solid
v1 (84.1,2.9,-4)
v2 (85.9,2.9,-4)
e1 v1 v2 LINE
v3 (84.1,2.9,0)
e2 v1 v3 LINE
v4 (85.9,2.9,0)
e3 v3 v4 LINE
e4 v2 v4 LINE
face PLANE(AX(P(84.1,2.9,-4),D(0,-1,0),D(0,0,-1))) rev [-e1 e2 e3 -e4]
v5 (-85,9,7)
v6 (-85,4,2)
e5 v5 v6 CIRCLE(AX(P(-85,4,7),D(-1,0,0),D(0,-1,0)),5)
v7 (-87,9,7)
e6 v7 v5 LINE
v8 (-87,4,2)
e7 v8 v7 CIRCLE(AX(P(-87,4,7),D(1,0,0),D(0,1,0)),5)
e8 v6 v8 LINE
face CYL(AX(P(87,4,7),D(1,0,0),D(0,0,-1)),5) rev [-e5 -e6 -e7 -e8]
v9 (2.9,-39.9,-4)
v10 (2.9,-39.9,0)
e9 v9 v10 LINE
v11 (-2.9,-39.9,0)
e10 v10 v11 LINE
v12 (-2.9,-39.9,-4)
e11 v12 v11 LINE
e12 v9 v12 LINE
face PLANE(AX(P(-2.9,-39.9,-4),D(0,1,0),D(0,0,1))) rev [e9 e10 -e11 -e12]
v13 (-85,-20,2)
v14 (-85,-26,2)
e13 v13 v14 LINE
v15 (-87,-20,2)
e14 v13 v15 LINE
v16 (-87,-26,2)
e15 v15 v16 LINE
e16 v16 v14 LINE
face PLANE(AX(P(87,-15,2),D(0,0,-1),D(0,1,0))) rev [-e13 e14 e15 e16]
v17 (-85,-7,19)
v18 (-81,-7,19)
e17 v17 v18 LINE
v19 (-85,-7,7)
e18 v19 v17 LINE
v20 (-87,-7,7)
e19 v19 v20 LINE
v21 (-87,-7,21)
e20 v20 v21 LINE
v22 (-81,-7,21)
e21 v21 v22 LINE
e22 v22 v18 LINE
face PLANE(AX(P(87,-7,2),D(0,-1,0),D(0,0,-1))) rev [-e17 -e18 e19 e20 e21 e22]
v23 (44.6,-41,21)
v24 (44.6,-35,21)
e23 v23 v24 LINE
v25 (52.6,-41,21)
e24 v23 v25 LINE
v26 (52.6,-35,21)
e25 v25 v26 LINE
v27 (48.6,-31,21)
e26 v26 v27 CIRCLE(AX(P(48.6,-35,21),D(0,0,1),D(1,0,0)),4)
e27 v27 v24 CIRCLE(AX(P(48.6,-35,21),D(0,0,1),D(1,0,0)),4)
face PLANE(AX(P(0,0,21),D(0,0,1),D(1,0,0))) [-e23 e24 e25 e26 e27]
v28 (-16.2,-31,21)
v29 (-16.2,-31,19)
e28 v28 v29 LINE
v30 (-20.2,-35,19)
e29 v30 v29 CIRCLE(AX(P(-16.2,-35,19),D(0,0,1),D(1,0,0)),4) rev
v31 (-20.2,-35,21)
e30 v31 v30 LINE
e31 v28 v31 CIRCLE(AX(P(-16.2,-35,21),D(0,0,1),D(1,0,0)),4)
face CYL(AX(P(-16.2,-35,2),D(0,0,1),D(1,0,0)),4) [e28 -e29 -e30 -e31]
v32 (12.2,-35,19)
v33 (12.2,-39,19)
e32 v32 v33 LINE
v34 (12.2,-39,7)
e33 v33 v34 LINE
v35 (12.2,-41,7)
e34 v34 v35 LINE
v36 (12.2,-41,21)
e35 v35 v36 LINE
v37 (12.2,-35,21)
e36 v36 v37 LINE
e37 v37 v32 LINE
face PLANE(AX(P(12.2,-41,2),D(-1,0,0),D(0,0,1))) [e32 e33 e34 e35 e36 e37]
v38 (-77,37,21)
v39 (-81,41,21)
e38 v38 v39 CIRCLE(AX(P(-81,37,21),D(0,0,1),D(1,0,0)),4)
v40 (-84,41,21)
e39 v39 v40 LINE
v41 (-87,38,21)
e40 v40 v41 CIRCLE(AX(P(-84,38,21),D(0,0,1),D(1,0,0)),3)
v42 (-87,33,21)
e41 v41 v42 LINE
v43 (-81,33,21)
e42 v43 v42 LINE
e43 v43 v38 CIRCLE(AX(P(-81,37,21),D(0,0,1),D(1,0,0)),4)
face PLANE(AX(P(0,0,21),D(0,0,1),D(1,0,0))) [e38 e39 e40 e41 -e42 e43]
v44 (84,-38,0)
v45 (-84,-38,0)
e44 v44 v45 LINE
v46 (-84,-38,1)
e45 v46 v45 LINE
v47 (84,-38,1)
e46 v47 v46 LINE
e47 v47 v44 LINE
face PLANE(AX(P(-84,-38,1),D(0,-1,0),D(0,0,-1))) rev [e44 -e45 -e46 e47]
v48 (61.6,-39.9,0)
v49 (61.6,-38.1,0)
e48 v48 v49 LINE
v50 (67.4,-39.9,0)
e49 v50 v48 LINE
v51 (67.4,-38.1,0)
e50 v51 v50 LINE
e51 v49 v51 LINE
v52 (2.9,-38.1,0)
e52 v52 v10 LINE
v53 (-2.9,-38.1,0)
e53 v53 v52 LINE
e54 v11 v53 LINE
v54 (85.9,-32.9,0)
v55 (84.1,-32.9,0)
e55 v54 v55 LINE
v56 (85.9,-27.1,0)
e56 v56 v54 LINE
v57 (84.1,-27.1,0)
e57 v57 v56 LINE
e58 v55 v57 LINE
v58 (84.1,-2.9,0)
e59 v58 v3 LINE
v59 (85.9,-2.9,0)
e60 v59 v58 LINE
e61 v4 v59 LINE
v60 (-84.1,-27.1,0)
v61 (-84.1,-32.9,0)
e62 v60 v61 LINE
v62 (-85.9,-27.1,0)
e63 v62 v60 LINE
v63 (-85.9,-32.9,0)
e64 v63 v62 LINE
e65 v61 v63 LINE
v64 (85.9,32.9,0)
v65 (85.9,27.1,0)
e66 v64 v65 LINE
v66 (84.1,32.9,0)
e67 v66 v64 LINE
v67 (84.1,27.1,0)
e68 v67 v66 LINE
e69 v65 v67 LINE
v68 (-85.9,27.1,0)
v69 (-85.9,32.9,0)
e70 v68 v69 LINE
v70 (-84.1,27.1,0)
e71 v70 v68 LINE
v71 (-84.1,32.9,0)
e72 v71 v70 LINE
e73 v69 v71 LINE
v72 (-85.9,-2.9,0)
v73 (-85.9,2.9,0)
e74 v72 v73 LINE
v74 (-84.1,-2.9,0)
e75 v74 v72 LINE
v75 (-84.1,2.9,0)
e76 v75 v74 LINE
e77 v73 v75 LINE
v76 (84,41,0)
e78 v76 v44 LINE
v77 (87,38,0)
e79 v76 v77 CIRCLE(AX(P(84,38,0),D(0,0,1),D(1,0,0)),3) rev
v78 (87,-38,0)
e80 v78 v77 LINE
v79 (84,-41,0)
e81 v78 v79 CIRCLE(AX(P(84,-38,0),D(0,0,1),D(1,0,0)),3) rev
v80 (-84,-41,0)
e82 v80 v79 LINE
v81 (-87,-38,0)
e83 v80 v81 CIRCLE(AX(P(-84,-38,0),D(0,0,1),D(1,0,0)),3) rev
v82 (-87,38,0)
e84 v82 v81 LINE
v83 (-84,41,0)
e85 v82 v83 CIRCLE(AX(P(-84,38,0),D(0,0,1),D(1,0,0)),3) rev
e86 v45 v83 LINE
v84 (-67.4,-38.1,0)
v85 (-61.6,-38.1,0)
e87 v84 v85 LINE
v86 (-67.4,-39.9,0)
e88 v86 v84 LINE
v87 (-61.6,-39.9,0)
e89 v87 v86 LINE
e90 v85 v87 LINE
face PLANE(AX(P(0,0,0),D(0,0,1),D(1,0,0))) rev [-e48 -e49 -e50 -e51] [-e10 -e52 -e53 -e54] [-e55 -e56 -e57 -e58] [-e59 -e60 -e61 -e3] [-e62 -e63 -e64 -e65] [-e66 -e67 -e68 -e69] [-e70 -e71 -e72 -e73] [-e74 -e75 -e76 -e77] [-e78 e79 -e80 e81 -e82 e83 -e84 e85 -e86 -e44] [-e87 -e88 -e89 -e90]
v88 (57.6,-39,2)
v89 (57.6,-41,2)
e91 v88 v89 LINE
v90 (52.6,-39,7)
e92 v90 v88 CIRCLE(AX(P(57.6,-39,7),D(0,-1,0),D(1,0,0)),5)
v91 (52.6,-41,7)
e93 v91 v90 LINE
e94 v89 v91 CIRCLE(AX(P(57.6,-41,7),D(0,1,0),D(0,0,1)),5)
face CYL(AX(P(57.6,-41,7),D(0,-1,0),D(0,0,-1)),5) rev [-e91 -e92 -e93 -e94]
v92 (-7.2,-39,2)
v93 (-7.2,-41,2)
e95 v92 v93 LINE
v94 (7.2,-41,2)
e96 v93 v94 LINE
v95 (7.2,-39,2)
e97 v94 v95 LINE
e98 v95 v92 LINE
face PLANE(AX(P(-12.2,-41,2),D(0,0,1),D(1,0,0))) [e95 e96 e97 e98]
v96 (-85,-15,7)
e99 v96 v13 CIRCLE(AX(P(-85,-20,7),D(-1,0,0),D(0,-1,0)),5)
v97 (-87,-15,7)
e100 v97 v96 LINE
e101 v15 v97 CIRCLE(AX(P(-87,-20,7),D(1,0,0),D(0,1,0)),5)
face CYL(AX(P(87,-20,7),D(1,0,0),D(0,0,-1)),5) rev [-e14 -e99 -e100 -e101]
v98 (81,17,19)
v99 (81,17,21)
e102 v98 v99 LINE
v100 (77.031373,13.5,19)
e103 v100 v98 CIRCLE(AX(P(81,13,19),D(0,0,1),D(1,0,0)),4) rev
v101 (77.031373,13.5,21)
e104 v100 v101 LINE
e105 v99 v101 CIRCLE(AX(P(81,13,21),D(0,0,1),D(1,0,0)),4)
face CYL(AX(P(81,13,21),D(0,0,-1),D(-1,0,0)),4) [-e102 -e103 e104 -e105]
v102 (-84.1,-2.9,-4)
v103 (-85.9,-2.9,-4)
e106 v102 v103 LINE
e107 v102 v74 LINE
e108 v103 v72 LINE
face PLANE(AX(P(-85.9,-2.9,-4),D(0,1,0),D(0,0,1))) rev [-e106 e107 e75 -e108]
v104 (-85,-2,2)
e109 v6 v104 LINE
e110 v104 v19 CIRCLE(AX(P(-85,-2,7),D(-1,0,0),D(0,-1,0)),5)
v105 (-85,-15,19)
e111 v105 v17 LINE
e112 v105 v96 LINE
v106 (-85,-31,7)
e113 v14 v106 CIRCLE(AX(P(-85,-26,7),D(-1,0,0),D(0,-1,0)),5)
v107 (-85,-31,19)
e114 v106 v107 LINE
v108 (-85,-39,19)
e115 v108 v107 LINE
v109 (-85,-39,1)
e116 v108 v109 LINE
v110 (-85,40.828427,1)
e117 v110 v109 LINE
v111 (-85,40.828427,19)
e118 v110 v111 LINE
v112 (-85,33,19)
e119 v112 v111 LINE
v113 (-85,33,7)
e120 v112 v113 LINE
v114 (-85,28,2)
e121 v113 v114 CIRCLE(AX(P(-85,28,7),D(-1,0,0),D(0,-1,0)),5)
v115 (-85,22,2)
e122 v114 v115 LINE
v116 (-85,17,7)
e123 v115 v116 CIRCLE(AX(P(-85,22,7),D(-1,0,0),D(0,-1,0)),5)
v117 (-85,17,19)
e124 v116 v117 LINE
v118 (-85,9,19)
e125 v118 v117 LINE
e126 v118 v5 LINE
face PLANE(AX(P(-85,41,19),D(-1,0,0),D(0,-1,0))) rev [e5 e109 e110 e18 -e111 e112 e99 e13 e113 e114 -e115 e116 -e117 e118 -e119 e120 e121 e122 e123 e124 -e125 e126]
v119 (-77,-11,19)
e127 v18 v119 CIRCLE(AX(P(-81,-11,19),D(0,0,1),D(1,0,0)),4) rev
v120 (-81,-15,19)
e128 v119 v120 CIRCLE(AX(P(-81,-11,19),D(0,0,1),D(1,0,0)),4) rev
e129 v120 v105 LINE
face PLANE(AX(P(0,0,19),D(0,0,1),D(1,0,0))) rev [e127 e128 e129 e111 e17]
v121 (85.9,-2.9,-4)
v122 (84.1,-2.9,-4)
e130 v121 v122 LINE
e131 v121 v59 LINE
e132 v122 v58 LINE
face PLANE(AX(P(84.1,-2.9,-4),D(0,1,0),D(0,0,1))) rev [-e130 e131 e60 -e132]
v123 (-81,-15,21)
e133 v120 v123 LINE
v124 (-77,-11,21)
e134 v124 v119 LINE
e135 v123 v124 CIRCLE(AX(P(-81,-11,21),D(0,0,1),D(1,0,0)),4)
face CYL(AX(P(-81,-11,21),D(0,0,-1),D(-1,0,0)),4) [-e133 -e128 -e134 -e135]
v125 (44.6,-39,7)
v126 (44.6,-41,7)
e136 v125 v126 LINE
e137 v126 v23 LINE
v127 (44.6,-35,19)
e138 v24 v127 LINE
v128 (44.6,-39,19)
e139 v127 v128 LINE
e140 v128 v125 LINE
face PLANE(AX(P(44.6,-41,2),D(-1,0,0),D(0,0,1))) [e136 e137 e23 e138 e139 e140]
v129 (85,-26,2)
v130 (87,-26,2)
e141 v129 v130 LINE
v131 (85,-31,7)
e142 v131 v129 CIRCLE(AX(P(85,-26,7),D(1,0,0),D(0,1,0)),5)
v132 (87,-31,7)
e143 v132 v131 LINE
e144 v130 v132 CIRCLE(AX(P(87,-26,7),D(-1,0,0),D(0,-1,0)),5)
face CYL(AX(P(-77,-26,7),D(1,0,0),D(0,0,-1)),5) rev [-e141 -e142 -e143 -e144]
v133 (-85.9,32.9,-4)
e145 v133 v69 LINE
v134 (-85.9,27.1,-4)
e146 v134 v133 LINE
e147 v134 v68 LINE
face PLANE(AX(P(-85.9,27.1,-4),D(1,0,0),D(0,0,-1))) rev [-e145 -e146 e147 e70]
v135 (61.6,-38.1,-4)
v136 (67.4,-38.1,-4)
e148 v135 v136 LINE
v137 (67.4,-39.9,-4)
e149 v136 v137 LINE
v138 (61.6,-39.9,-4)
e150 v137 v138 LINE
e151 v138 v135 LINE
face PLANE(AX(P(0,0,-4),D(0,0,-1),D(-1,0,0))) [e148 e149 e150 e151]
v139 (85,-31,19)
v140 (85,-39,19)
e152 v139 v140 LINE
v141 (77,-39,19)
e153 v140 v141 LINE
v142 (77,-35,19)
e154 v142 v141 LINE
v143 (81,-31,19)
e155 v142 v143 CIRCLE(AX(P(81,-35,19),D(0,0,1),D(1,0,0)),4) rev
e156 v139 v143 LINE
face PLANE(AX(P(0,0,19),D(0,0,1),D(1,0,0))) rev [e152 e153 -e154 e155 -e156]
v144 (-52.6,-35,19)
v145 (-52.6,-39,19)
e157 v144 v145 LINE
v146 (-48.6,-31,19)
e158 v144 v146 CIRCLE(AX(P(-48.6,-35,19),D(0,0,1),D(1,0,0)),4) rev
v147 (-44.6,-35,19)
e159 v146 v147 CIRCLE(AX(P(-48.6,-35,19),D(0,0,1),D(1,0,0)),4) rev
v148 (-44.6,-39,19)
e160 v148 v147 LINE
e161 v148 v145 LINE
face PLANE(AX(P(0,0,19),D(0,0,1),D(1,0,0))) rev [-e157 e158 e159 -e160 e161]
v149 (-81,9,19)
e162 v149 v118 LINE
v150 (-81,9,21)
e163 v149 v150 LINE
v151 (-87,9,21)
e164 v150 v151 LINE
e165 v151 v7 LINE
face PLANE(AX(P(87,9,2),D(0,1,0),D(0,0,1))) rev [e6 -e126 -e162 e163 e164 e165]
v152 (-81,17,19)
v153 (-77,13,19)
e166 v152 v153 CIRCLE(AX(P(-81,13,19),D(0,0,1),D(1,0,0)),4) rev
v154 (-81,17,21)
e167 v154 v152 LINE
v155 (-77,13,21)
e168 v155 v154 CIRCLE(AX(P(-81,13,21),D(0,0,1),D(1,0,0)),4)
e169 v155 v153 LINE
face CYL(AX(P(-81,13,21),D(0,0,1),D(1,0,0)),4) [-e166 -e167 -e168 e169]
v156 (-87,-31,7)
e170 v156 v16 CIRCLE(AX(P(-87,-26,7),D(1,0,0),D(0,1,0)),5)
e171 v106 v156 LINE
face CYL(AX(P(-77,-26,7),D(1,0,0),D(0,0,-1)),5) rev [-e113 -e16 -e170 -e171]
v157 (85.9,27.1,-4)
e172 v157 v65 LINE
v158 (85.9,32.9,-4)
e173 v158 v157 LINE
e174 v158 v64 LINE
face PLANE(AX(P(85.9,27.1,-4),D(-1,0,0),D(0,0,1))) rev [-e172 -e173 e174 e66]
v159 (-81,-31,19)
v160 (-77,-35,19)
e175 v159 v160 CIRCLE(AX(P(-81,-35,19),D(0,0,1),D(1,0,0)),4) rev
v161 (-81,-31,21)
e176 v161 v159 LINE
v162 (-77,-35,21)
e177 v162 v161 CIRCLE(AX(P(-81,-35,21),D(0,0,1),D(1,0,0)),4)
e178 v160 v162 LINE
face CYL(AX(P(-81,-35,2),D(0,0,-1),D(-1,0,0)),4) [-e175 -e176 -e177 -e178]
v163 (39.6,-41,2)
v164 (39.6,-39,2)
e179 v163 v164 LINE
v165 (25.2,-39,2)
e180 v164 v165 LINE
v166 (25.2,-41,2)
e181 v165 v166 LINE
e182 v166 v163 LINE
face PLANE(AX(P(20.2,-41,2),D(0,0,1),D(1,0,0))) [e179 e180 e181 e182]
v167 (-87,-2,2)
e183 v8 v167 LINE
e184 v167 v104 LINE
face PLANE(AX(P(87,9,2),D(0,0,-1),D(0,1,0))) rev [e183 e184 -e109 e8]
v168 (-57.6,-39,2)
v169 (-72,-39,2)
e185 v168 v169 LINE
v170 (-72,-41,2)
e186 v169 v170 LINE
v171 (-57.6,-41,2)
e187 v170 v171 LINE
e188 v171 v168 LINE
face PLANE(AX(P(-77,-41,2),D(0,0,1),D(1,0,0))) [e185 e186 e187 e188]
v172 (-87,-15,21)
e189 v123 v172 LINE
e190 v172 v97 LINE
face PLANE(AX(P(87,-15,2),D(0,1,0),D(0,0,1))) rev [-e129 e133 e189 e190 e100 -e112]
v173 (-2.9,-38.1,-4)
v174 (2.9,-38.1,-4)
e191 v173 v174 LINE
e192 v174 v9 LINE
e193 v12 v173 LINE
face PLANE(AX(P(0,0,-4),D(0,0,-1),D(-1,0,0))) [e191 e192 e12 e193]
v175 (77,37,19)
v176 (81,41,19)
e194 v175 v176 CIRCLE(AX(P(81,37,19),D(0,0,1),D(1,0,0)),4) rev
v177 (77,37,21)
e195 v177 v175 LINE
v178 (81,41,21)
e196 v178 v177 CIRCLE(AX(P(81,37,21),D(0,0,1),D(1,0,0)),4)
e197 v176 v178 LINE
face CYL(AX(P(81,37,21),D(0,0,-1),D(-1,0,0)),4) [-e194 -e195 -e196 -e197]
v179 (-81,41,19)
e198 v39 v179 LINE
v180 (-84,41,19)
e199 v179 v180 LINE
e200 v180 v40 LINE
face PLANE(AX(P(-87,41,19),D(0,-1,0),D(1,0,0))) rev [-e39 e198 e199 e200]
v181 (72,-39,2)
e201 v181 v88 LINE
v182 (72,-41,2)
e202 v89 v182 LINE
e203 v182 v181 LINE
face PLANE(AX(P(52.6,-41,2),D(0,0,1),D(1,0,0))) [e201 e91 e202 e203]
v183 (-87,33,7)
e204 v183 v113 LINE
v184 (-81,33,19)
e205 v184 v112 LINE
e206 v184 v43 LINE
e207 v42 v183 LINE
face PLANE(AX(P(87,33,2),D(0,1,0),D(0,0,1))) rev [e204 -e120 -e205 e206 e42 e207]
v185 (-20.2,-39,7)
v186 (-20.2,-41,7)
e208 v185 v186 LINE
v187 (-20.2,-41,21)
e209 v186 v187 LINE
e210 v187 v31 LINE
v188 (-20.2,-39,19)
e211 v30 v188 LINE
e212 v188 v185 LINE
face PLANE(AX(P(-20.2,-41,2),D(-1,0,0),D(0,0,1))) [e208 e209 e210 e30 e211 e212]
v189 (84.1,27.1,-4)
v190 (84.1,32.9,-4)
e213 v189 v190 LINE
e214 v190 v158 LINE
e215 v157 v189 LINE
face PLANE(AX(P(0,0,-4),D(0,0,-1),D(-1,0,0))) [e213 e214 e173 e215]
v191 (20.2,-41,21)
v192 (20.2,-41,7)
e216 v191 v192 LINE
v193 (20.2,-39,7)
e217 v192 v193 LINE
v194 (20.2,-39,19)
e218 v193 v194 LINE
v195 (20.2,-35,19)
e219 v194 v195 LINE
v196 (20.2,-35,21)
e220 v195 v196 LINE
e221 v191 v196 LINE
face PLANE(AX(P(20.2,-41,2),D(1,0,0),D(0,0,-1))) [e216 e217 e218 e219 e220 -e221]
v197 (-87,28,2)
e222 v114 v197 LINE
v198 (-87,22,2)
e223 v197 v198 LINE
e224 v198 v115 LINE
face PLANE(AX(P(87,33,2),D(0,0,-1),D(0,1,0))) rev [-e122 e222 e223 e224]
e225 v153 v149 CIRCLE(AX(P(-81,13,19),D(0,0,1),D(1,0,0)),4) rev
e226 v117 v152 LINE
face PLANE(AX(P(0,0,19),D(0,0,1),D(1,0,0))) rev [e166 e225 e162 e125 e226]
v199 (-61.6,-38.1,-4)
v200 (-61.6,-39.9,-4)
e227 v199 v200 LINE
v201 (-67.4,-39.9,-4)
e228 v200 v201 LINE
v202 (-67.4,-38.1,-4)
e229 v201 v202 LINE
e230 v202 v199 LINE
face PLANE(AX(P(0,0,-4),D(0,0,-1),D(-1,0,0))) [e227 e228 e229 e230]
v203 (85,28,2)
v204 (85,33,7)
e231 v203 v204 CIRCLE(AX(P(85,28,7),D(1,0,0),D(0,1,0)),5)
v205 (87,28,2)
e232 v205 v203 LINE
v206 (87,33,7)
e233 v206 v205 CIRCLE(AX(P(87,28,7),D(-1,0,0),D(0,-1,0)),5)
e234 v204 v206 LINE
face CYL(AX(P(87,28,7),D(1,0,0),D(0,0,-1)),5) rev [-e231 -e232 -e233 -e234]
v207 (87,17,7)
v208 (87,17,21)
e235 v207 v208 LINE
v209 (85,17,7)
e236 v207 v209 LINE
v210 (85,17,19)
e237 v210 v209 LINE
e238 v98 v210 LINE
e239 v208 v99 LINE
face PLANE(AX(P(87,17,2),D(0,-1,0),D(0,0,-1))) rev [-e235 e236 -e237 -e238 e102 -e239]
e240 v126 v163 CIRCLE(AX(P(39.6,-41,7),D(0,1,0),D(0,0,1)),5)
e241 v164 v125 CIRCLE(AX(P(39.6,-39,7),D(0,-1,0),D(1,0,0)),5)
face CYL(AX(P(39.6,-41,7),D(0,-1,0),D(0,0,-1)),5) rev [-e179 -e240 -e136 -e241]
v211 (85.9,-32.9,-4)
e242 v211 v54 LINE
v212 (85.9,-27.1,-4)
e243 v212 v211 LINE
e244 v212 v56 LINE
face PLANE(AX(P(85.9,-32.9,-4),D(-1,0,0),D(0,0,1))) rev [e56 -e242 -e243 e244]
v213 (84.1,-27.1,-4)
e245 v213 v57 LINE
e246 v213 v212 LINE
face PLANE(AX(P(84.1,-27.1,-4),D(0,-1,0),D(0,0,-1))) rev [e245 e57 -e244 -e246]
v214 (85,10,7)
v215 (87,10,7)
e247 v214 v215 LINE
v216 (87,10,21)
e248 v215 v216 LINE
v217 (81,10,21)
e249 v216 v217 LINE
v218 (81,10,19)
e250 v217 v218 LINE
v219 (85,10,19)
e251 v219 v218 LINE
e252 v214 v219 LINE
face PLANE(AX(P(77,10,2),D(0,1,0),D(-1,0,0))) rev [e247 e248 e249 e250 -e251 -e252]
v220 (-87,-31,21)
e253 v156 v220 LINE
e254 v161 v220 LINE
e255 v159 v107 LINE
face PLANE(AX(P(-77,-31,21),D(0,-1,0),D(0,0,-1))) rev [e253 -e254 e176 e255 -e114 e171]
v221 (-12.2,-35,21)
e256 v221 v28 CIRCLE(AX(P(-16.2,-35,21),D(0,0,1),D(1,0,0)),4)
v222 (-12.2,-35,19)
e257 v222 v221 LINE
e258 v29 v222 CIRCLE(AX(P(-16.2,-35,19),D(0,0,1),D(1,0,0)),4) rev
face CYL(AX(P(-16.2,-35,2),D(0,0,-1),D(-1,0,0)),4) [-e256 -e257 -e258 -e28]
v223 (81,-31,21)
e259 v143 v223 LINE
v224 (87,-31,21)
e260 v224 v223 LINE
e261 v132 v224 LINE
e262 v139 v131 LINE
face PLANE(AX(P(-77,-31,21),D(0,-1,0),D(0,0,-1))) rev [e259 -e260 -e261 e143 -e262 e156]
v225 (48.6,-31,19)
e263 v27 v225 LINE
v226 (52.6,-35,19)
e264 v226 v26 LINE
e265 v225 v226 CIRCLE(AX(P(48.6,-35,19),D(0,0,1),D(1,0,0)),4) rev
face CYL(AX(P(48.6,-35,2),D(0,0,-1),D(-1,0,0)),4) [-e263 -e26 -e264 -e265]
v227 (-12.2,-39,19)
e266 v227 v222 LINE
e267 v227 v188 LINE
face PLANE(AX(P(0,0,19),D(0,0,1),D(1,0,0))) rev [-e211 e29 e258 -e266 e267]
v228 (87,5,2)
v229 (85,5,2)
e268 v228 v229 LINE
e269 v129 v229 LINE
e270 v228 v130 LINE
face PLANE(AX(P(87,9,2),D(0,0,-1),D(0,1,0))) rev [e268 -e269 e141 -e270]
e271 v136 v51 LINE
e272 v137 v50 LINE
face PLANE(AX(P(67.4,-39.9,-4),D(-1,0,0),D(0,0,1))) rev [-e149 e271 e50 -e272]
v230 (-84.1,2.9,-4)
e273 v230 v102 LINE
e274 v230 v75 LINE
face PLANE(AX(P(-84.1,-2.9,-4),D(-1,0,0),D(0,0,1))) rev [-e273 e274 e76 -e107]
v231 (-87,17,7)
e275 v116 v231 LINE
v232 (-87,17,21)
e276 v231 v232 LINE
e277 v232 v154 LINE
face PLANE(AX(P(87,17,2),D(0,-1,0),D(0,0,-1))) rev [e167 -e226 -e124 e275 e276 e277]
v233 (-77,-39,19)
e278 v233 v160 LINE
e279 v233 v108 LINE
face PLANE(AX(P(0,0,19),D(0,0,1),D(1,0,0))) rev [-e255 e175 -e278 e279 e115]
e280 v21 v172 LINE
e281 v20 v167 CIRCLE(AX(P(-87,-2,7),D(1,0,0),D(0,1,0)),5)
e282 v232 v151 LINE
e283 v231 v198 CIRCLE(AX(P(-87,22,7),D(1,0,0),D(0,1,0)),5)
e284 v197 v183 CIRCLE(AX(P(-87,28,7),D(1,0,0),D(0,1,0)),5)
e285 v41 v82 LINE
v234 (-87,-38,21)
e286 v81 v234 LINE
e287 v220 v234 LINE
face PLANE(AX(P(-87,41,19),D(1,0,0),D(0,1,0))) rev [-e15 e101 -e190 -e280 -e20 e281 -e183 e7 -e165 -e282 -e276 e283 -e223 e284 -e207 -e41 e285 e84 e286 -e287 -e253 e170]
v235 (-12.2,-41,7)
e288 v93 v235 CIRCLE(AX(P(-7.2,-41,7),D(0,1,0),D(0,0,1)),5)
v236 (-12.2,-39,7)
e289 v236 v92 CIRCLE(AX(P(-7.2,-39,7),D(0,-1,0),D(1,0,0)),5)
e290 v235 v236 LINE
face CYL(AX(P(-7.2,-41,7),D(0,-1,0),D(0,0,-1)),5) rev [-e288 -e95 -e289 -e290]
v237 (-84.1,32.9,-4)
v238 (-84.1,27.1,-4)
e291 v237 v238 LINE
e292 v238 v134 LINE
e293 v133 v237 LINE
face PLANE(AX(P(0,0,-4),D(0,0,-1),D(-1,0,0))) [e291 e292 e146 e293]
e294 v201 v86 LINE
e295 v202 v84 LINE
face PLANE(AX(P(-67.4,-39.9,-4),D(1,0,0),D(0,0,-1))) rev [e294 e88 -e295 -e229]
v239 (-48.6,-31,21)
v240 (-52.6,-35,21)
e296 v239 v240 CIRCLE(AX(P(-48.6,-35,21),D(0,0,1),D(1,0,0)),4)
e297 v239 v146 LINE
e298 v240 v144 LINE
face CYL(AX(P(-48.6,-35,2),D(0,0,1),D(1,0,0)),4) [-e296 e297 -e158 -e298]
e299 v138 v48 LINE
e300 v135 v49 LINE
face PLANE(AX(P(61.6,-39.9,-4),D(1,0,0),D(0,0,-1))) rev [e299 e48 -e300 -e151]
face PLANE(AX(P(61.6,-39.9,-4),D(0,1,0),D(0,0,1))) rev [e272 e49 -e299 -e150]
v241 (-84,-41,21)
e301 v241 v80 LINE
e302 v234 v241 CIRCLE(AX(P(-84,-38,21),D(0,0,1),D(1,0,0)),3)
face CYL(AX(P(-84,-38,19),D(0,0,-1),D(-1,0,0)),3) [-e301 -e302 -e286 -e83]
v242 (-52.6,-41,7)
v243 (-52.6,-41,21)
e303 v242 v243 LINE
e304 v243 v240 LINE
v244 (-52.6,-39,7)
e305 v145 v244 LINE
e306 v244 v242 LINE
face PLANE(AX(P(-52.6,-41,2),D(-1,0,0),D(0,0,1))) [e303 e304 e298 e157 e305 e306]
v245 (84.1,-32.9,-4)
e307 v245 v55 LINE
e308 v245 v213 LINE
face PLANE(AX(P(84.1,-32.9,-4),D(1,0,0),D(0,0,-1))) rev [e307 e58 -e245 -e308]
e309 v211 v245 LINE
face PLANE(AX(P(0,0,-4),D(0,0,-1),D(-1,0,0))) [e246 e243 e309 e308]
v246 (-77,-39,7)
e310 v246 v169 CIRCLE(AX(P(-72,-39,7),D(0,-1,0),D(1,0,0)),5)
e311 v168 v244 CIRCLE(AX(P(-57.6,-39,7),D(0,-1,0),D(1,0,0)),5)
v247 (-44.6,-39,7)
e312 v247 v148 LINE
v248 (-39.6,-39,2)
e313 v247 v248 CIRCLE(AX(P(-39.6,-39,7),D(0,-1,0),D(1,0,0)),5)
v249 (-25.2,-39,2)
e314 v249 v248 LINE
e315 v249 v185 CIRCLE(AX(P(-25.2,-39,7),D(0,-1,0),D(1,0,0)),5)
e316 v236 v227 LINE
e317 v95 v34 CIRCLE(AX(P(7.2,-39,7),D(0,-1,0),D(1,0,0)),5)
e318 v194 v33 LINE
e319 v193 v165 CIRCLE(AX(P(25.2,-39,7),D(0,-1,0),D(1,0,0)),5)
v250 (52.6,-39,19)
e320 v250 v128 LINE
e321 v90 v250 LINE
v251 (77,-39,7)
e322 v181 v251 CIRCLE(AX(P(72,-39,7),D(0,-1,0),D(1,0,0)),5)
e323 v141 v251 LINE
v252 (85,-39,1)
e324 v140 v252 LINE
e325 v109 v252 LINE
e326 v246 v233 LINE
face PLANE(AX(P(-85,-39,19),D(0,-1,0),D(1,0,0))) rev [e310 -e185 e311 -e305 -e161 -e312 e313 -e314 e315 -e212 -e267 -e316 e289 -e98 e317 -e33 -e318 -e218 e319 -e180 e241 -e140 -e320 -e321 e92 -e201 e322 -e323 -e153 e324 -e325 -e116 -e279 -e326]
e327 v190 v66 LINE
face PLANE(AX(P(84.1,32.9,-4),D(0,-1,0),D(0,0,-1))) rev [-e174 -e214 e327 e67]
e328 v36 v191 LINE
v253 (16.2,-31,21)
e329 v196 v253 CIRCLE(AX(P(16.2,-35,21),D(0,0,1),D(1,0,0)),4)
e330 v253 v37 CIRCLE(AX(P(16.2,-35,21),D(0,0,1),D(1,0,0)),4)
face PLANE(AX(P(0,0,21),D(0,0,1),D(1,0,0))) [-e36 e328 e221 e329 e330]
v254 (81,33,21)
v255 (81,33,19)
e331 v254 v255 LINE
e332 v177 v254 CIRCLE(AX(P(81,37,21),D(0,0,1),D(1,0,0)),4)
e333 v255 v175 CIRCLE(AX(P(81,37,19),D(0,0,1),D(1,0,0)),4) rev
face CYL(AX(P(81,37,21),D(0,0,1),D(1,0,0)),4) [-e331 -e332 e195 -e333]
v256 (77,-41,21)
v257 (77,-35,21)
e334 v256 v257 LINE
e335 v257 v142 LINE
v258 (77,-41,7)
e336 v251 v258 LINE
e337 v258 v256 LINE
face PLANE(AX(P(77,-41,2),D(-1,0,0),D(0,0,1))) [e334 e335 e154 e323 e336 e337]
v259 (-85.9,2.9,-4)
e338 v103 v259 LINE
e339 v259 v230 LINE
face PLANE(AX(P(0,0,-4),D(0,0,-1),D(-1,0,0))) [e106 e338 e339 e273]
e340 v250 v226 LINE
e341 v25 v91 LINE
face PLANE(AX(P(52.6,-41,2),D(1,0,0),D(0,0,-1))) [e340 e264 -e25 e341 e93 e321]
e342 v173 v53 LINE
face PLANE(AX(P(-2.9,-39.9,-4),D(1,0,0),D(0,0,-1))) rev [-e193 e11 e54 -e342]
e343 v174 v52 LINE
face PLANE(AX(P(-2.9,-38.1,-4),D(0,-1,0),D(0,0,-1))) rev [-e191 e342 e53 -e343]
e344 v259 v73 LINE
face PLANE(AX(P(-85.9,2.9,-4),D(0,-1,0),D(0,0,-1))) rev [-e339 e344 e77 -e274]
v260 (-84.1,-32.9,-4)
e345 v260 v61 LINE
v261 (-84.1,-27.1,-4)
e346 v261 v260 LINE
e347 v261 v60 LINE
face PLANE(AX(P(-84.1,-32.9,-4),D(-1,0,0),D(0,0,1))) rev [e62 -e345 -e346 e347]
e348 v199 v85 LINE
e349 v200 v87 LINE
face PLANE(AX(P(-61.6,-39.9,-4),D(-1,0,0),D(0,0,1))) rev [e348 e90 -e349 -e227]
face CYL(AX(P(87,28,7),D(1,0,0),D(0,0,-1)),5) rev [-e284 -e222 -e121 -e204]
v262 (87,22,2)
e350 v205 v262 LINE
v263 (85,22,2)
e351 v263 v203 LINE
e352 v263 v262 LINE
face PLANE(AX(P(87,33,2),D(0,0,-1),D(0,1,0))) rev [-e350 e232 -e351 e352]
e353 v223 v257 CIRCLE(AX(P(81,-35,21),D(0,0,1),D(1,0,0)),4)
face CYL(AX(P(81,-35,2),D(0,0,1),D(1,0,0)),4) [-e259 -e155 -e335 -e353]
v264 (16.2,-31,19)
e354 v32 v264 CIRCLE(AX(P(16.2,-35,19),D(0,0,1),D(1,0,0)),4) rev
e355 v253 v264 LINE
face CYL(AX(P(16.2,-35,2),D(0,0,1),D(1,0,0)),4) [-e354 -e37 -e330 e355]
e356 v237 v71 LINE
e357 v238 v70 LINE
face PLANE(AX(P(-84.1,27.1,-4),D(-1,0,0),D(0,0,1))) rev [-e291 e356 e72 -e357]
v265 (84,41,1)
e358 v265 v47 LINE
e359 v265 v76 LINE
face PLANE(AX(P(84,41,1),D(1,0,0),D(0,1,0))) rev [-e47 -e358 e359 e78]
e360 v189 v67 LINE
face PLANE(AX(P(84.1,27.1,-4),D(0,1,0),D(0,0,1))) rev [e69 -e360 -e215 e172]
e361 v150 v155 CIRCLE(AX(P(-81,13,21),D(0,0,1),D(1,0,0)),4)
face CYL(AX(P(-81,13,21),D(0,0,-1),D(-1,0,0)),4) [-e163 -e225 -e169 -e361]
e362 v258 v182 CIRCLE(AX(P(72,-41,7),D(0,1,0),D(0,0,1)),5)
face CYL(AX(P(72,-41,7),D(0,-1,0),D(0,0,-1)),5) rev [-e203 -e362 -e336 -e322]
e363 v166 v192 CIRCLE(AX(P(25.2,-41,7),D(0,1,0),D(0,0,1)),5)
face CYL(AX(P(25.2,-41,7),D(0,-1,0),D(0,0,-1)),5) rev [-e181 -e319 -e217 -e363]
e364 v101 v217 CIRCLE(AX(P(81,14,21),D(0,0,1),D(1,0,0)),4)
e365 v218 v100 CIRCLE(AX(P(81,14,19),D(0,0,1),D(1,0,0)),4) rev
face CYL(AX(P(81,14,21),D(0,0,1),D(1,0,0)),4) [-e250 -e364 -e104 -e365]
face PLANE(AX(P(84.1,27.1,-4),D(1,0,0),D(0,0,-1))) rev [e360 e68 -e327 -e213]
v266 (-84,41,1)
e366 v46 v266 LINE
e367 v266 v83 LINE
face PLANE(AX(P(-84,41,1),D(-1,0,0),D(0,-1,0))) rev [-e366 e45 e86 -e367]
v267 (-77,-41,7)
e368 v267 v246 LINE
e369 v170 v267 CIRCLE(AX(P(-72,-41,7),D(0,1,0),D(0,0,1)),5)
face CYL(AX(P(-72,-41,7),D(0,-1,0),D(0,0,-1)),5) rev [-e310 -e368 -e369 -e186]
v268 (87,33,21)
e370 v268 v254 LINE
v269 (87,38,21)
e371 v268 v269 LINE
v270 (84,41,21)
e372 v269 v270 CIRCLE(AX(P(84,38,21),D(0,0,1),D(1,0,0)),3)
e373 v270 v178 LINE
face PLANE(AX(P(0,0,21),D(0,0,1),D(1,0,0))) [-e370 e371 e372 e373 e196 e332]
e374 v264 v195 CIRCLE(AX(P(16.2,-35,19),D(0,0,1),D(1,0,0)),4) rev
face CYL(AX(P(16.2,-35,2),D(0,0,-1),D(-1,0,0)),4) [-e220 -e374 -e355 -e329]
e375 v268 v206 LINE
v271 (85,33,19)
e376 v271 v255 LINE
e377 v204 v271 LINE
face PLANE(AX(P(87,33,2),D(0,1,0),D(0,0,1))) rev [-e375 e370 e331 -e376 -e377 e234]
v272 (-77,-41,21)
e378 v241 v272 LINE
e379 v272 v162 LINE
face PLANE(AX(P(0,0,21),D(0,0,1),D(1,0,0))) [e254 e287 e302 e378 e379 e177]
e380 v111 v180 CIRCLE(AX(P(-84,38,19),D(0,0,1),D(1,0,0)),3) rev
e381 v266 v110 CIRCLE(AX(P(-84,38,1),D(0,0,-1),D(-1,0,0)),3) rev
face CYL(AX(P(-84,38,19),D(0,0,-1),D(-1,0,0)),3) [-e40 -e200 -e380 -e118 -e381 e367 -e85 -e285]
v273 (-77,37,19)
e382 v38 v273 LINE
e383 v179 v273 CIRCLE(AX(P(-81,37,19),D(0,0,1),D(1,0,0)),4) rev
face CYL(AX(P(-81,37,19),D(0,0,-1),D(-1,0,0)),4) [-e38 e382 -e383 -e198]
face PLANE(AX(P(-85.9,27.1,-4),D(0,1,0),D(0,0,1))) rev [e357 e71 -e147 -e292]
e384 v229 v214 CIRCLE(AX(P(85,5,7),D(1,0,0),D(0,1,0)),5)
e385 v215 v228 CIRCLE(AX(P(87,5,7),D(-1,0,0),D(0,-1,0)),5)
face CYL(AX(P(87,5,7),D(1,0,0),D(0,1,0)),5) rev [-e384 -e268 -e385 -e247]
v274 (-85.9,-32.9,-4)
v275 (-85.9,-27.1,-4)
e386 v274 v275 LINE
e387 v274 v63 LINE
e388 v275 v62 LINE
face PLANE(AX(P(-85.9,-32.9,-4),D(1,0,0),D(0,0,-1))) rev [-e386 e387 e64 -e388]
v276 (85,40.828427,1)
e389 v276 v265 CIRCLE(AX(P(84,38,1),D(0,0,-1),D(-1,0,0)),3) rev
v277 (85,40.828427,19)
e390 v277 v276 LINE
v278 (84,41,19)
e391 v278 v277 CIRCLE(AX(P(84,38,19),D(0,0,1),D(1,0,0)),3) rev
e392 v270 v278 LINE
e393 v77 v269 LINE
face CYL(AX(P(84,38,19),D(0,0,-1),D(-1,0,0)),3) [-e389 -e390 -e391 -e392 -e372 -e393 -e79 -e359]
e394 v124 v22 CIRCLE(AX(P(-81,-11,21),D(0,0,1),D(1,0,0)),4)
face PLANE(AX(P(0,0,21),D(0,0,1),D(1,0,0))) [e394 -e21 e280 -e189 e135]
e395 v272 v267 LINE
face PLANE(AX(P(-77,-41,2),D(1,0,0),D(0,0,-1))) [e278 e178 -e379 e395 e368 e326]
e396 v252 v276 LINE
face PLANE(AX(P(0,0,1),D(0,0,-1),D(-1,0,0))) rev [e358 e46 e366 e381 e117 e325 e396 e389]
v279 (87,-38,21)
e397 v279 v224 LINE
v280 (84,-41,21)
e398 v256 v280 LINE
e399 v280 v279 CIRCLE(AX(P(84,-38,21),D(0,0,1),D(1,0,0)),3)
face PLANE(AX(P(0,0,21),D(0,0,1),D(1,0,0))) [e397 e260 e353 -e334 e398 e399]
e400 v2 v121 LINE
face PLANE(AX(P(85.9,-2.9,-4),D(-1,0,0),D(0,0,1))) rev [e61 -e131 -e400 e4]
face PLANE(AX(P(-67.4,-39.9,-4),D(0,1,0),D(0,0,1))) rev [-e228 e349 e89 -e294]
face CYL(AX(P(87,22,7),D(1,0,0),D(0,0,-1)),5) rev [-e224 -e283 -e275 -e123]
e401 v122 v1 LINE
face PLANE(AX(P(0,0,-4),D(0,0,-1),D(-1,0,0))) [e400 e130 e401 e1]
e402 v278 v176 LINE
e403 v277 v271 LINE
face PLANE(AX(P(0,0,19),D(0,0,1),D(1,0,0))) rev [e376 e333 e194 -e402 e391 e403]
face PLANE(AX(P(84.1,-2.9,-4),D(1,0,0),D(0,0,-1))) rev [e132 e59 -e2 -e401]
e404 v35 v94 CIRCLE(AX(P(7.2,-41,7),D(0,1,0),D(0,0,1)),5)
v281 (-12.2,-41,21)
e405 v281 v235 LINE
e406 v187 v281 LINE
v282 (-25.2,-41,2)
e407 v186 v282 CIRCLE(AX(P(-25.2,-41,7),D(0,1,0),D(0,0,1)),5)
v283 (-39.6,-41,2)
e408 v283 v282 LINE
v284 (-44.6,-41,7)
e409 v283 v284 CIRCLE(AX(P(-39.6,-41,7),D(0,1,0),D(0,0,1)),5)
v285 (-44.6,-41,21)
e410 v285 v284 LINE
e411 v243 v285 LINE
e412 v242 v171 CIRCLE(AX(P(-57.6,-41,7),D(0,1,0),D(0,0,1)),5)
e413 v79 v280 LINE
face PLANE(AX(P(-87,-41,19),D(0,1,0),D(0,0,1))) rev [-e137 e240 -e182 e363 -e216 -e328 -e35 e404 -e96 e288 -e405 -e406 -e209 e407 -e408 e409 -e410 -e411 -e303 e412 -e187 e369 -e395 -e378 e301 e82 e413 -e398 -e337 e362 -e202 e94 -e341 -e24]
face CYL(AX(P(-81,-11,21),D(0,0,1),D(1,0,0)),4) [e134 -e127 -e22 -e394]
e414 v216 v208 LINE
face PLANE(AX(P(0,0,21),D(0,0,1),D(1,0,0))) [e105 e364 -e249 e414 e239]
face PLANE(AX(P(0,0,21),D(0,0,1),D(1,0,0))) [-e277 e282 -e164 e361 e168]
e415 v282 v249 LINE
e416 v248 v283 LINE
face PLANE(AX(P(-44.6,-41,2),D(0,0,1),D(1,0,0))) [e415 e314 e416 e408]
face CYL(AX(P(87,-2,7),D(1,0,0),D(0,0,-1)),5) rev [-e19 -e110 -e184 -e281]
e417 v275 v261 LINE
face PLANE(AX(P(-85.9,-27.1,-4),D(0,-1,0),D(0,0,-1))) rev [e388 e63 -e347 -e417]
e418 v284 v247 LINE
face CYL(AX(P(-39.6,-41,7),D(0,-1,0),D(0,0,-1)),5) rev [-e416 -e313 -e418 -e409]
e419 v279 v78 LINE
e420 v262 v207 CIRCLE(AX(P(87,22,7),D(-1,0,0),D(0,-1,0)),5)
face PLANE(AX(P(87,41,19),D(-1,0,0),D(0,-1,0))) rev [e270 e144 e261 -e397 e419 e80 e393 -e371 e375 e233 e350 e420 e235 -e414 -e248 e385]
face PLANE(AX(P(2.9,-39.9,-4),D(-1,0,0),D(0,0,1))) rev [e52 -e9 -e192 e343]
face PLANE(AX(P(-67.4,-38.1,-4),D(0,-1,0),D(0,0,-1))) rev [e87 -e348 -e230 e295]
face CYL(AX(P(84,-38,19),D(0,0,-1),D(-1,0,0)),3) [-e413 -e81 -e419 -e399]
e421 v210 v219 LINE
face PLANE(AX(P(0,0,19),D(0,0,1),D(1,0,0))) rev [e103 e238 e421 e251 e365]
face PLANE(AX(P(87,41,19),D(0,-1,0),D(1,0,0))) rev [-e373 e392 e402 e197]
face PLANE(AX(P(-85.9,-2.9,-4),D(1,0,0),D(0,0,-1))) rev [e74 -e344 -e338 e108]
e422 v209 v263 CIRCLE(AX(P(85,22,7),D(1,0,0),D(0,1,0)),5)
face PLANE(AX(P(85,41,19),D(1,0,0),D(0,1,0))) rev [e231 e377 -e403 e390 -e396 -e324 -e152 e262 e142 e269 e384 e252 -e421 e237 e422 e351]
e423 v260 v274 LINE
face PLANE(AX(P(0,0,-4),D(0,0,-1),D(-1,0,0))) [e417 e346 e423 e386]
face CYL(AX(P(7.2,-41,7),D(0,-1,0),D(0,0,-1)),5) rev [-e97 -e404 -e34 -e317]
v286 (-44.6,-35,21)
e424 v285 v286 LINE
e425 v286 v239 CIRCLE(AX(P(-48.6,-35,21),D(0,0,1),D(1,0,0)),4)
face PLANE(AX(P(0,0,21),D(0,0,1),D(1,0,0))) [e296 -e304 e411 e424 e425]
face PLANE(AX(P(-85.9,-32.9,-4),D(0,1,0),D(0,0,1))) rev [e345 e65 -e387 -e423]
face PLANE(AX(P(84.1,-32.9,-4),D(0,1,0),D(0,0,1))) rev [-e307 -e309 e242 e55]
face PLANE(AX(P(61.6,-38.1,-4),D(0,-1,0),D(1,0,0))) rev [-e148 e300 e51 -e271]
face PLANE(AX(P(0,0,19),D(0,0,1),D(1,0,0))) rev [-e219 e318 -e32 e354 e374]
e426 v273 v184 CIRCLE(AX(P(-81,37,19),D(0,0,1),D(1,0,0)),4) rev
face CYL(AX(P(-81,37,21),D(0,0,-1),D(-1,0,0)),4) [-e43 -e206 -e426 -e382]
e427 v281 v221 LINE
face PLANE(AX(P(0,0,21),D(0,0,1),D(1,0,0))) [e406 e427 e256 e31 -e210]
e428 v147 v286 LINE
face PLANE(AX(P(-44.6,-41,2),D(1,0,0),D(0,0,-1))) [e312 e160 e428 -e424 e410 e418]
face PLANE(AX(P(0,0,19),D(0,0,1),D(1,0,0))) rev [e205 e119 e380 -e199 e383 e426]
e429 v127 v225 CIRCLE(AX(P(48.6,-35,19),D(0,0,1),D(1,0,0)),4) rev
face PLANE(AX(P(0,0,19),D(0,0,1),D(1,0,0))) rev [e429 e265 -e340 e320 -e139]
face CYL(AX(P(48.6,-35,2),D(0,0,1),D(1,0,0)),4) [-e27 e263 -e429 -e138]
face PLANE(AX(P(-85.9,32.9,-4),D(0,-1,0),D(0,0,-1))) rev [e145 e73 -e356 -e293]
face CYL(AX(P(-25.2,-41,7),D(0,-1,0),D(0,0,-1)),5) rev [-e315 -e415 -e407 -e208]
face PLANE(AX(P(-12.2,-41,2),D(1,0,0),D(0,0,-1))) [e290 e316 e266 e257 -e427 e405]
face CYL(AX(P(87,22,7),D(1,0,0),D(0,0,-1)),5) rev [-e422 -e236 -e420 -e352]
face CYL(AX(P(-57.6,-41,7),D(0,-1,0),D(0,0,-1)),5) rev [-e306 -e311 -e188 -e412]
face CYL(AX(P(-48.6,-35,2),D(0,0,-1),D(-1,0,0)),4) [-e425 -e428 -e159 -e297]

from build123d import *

# Parameters (mm, degrees)
SKETCH9_W               = 1.8
SKETCH9_H               = 5.8
BOSS_EXTRUDE8_DEPTH     = 4
BOSS_EXTRUDE8_2_DEPTH   = 4
BOSS_EXTRUDE8_3_DEPTH   = 4
BOSS_EXTRUDE8_4_DEPTH   = 4
BOSS_EXTRUDE8_5_DEPTH   = 4
BOSS_EXTRUDE8_6_DEPTH   = 4
SKETCH9_W_2             = 5.8
SKETCH9_H_2             = 1.8
BOSS_EXTRUDE8_7_DEPTH   = 4
BOSS_EXTRUDE8_8_DEPTH   = 4
BOSS_EXTRUDE8_9_DEPTH   = 4
BOSS_EXTRUDE5_DEPTH     = 19
BOSS_EXTRUDE6_DEPTH     = 2
BOSS_EXTRUDE11_DEPTH    = 1
CUT_EXTRUDE6_DEPTH      = 99.442876837
CUT_EXTRUDE6_DEPTH_BACK = 99.442876837
SKETCH18_W              = 19
SKETCH18_H              = 16
SKETCH19_W              = 24.4
SKETCH19_H              = 19
CUT_EXTRUDE8_DEPTH      = 99.442876837
CUT_EXTRUDE9_START      = -19
SKETCH10_W              = 10
SKETCH10_H              = 34
CUT_EXTRUDE9_DEPTH      = 19
FILLET3_R               = 4
FILLET4_R               = 5
FILLET5_R               = 3


with BuildPart() as part:
    # Sketch9 → Boss-Extrude8 (new body)
    with BuildSketch(Plane(origin=(0, 0, 0), x_dir=(1, 0, 0), z_dir=(0, 0, -1))):
        with Locations((-85, 30)):
            Rectangle(SKETCH9_W, SKETCH9_H)
    extrude(amount=BOSS_EXTRUDE8_DEPTH)



with BuildPart() as body_2:
    # Sketch9 → Boss-Extrude8 2 (new body)
    with BuildSketch(Plane(origin=(0, 0, 0), x_dir=(1, 0, 0), z_dir=(0, 0, -1))):
        with Locations((-85, 0)):
            Rectangle(SKETCH9_W, SKETCH9_H)
    extrude(amount=BOSS_EXTRUDE8_2_DEPTH)


with BuildPart() as body_3:
    # Sketch9 → Boss-Extrude8 3 (new body)
    with BuildSketch(Plane(origin=(0, 0, 0), x_dir=(1, 0, 0), z_dir=(0, 0, -1))):
        with Locations((-85, -30)):
            Rectangle(SKETCH9_W, SKETCH9_H)
    extrude(amount=BOSS_EXTRUDE8_3_DEPTH)


with BuildPart() as body_4:
    # Sketch9 → Boss-Extrude8 4 (new body)
    with BuildSketch(Plane(origin=(0, 0, 0), x_dir=(1, 0, 0), z_dir=(0, 0, -1))):
        with Locations((85, 30)):
            Rectangle(SKETCH9_W, SKETCH9_H)
    extrude(amount=BOSS_EXTRUDE8_4_DEPTH)


with BuildPart() as body_5:
    # Sketch9 → Boss-Extrude8 5 (new body)
    with BuildSketch(Plane(origin=(0, 0, 0), x_dir=(1, 0, 0), z_dir=(0, 0, -1))):
        with Locations((85, -30)):
            Rectangle(SKETCH9_W, SKETCH9_H)
    extrude(amount=BOSS_EXTRUDE8_5_DEPTH)


with BuildPart() as body_6:
    # Sketch9 → Boss-Extrude8 6 (new body)
    with BuildSketch(Plane(origin=(0, 0, 0), x_dir=(1, 0, 0), z_dir=(0, 0, -1))):
        with Locations((85, 0)):
            Rectangle(SKETCH9_W, SKETCH9_H)
    extrude(amount=BOSS_EXTRUDE8_6_DEPTH)


with BuildPart() as body_7:
    # Sketch9 → Boss-Extrude8 7 (new body)
    with BuildSketch(Plane(origin=(0, 0, 0), x_dir=(1, 0, 0), z_dir=(0, 0, -1))):
        with Locations((-64.5, 39)):
            Rectangle(SKETCH9_W_2, SKETCH9_H_2)
    extrude(amount=BOSS_EXTRUDE8_7_DEPTH)


with BuildPart() as body_8:
    # Sketch9 → Boss-Extrude8 8 (new body)
    with BuildSketch(Plane(origin=(0, 0, 0), x_dir=(1, 0, 0), z_dir=(0, 0, -1))):
        with Locations((0, 39)):
            Rectangle(SKETCH9_W_2, SKETCH9_H_2)
    extrude(amount=BOSS_EXTRUDE8_8_DEPTH)


with BuildPart() as body_9:
    # Sketch9 → Boss-Extrude8 9 (new body)
    with BuildSketch(Plane(origin=(0, 0, 0), x_dir=(1, 0, 0), z_dir=(0, 0, -1))):
        with Locations((64.5, 39)):
            Rectangle(SKETCH9_W_2, SKETCH9_H_2)
    extrude(amount=BOSS_EXTRUDE8_9_DEPTH)


with BuildPart() as part_1:
    add(part.part)

    add(body_2.part)  # Boss-Extrude5 merges body 2

    add(body_3.part)  # Boss-Extrude5 merges body 3

    add(body_4.part)  # Boss-Extrude5 merges body 4

    add(body_5.part)  # Boss-Extrude5 merges body 5

    add(body_6.part)  # Boss-Extrude5 merges body 6

    add(body_7.part)  # Boss-Extrude5 merges body 7

    add(body_8.part)  # Boss-Extrude5 merges body 8

    add(body_9.part)  # Boss-Extrude5 merges body 9
    # Sketch1 → Boss-Extrude5 (add)
    with BuildSketch(Plane.XY):
        Polygon((-87, 41), (-85, 41), (-85, -39), (85, -39), (85, 41), (87, 41), (87, -41), (-87, -41), align=None)
    extrude(amount=BOSS_EXTRUDE5_DEPTH)

    # Sketch7 → Boss-Extrude6 (add)
    with BuildSketch(Plane.XY.offset(19)):
        Polygon((-87, 41), (-77, 41), (-77, -31), (77, -31), (77, 41), (87, 41), (87, -41), (-87, -41), align=None)
    extrude(amount=BOSS_EXTRUDE6_DEPTH)

    # Sketch17 → Boss-Extrude11 (add)
    with BuildSketch(Plane.XY):
        Polygon((-84, 41), (-85, 41), (-85, -39), (85, -39), (85, 41), (84, 41), (84, -38), (-84, -38), align=None)
    extrude(amount=BOSS_EXTRUDE11_DEPTH)

    # Sketch18 → Cut-Extrude6 (cut, two sides: drawn at the far end of the back side and taken through both)
    with BuildSketch(Plane.ZY.offset(-CUT_EXTRUDE6_DEPTH_BACK)):
        with Locations((11.5, 25)):
            Rectangle(SKETCH18_W, SKETCH18_H)
        with Locations((11.5, 1)):
            Rectangle(SKETCH18_W, SKETCH18_H)
        with Locations((11.5, -23)):
            Rectangle(SKETCH18_W, SKETCH18_H)
    extrude(amount=CUT_EXTRUDE6_DEPTH + CUT_EXTRUDE6_DEPTH_BACK, mode=Mode.SUBTRACT)

    # Sketch19 → Cut-Extrude8 (cut, through all)
    with BuildSketch(Plane.XZ):
        with Locations((-64.8, 11.5)):
            Rectangle(SKETCH19_W, SKETCH19_H)
        with Locations((-32.4, 11.5)):
            Rectangle(SKETCH19_W, SKETCH19_H)
        with Locations((0, 11.5)):
            Rectangle(SKETCH19_W, SKETCH19_H)
        with Locations((32.4, 11.5)):
            Rectangle(SKETCH19_W, SKETCH19_H)
        with Locations((64.8, 11.5)):
            Rectangle(SKETCH19_W, SKETCH19_H)
    extrude(amount=CUT_EXTRUDE8_DEPTH, mode=Mode.SUBTRACT)

    # Sketch10 → Cut-Extrude9 (cut)
    with BuildSketch(Plane.XY.offset(21).offset(CUT_EXTRUDE9_START)):
        with Locations((82, -7)):
            Rectangle(SKETCH10_W, SKETCH10_H)
    extrude(amount=CUT_EXTRUDE9_DEPTH, mode=Mode.SUBTRACT)

    # Fillet3
    # the kernel refuses this fillet: 4 mm, written as the material it takes off along each edge
    with BuildSketch(Plane(origin=(77, 41, 9), x_dir=(0, -1, 0), z_dir=(0, 0, 1)), Plane(origin=(-77, 33, 9), x_dir=(0, 1, 0), z_dir=(0, 0, 1)), Plane(origin=(77, 17, 9), x_dir=(0, -1, 0), z_dir=(0, 0, 1)), Plane(origin=(-77, 17, 31), x_dir=(0, -1, 0), z_dir=(0, 0, -1)), Plane(origin=(-77, 9, 9), x_dir=(0, 1, 0), z_dir=(0, 0, 1)), Plane(origin=(-77, -7, 31), x_dir=(0, -1, 0), z_dir=(0, 0, -1)), Plane(origin=(-77, -15, 9), x_dir=(0, 1, 0), z_dir=(0, 0, 1)), Plane(origin=(-44.6, -31, 9), x_dir=(-1, 0, 0), z_dir=(0, 0, 1)), Plane(origin=(-12.2, -31, 9), x_dir=(-1, 0, 0), z_dir=(0, 0, 1)), Plane(origin=(20.2, -31, 9), x_dir=(-1, 0, 0), z_dir=(0, 0, 1)), Plane(origin=(52.6, -31, 9), x_dir=(-1, 0, 0), z_dir=(0, 0, 1)), Plane(origin=(77, 10, 9), x_dir=(1, 0, 0), z_dir=(0, 0, 1))) as fillet3_piece_1:
        with BuildLine():
            CenterArc((FILLET3_R, FILLET3_R), FILLET3_R, 180, 90)
            Line((0, FILLET3_R), (0, 0))
            Line((0, 0), (FILLET3_R, 0))
        make_face()
    extrude(amount=22, mode=Mode.SUBTRACT)
    with BuildSketch(Plane(origin=(-77, 41, 9), x_dir=(0, -1, 0), z_dir=(0, 0, 1)), Plane(origin=(77, 33, 31), x_dir=(1, 0, 0), z_dir=(0, 0, -1)), Plane(origin=(-77, -31, 9), x_dir=(0, -1, 0), z_dir=(0, 0, 1)), Plane(origin=(-52.6, -31, 31), x_dir=(0, -1, 0), z_dir=(0, 0, -1)), Plane(origin=(-20.2, -31, 31), x_dir=(0, -1, 0), z_dir=(0, 0, -1)), Plane(origin=(12.2, -31, 31), x_dir=(0, -1, 0), z_dir=(0, 0, -1)), Plane(origin=(44.6, -31, 31), x_dir=(0, -1, 0), z_dir=(0, 0, -1)), Plane(origin=(77, -31, 31), x_dir=(0, -1, 0), z_dir=(0, 0, -1))) as fillet3_piece_2:
        with BuildLine():
            CenterArc((FILLET3_R, -FILLET3_R), FILLET3_R, 90, 90)
            Line((0, -FILLET3_R), (0, 0))
            Line((0, 0), (FILLET3_R, 0))
        make_face()
    extrude(amount=22, mode=Mode.SUBTRACT)

    # Fillet4
    fillet4_edges = [part_1.edges().sort_by_distance(p)[0] for p in [
        (86, 17, 2),
        (-86, 17, 2),
        (86, 33, 2),
        (-86, 33, 2),
        (-86, -7, 2),
        (-86, 9, 2),
        (86, -31, 2),
        (-86, -31, 2),
        (-86, -15, 2),
        (-77, -40, 2),
        (-52.6, -40, 2),
        (-44.6, -40, 2),
        (-20.2, -40, 2),
        (-12.2, -40, 2),
        (12.2, -40, 2),
        (20.2, -40, 2),
        (44.6, -40, 2),
        (52.6, -40, 2),
        (77, -40, 2),
        (86, 10, 2),
    ]]
    fillet(fillet4_edges, radius=FILLET4_R)

    # Fillet5
    fillet5_edges = [part_1.edges().sort_by_distance(p)[0] for p in [
        (-87, 41, 10.5),
        (-87, -41, 10.5),
        (87, -41, 10.5),
        (87, 41, 10.5),
    ]]
    fillet(fillet5_edges, radius=FILLET5_R)


solid = part_1.part
